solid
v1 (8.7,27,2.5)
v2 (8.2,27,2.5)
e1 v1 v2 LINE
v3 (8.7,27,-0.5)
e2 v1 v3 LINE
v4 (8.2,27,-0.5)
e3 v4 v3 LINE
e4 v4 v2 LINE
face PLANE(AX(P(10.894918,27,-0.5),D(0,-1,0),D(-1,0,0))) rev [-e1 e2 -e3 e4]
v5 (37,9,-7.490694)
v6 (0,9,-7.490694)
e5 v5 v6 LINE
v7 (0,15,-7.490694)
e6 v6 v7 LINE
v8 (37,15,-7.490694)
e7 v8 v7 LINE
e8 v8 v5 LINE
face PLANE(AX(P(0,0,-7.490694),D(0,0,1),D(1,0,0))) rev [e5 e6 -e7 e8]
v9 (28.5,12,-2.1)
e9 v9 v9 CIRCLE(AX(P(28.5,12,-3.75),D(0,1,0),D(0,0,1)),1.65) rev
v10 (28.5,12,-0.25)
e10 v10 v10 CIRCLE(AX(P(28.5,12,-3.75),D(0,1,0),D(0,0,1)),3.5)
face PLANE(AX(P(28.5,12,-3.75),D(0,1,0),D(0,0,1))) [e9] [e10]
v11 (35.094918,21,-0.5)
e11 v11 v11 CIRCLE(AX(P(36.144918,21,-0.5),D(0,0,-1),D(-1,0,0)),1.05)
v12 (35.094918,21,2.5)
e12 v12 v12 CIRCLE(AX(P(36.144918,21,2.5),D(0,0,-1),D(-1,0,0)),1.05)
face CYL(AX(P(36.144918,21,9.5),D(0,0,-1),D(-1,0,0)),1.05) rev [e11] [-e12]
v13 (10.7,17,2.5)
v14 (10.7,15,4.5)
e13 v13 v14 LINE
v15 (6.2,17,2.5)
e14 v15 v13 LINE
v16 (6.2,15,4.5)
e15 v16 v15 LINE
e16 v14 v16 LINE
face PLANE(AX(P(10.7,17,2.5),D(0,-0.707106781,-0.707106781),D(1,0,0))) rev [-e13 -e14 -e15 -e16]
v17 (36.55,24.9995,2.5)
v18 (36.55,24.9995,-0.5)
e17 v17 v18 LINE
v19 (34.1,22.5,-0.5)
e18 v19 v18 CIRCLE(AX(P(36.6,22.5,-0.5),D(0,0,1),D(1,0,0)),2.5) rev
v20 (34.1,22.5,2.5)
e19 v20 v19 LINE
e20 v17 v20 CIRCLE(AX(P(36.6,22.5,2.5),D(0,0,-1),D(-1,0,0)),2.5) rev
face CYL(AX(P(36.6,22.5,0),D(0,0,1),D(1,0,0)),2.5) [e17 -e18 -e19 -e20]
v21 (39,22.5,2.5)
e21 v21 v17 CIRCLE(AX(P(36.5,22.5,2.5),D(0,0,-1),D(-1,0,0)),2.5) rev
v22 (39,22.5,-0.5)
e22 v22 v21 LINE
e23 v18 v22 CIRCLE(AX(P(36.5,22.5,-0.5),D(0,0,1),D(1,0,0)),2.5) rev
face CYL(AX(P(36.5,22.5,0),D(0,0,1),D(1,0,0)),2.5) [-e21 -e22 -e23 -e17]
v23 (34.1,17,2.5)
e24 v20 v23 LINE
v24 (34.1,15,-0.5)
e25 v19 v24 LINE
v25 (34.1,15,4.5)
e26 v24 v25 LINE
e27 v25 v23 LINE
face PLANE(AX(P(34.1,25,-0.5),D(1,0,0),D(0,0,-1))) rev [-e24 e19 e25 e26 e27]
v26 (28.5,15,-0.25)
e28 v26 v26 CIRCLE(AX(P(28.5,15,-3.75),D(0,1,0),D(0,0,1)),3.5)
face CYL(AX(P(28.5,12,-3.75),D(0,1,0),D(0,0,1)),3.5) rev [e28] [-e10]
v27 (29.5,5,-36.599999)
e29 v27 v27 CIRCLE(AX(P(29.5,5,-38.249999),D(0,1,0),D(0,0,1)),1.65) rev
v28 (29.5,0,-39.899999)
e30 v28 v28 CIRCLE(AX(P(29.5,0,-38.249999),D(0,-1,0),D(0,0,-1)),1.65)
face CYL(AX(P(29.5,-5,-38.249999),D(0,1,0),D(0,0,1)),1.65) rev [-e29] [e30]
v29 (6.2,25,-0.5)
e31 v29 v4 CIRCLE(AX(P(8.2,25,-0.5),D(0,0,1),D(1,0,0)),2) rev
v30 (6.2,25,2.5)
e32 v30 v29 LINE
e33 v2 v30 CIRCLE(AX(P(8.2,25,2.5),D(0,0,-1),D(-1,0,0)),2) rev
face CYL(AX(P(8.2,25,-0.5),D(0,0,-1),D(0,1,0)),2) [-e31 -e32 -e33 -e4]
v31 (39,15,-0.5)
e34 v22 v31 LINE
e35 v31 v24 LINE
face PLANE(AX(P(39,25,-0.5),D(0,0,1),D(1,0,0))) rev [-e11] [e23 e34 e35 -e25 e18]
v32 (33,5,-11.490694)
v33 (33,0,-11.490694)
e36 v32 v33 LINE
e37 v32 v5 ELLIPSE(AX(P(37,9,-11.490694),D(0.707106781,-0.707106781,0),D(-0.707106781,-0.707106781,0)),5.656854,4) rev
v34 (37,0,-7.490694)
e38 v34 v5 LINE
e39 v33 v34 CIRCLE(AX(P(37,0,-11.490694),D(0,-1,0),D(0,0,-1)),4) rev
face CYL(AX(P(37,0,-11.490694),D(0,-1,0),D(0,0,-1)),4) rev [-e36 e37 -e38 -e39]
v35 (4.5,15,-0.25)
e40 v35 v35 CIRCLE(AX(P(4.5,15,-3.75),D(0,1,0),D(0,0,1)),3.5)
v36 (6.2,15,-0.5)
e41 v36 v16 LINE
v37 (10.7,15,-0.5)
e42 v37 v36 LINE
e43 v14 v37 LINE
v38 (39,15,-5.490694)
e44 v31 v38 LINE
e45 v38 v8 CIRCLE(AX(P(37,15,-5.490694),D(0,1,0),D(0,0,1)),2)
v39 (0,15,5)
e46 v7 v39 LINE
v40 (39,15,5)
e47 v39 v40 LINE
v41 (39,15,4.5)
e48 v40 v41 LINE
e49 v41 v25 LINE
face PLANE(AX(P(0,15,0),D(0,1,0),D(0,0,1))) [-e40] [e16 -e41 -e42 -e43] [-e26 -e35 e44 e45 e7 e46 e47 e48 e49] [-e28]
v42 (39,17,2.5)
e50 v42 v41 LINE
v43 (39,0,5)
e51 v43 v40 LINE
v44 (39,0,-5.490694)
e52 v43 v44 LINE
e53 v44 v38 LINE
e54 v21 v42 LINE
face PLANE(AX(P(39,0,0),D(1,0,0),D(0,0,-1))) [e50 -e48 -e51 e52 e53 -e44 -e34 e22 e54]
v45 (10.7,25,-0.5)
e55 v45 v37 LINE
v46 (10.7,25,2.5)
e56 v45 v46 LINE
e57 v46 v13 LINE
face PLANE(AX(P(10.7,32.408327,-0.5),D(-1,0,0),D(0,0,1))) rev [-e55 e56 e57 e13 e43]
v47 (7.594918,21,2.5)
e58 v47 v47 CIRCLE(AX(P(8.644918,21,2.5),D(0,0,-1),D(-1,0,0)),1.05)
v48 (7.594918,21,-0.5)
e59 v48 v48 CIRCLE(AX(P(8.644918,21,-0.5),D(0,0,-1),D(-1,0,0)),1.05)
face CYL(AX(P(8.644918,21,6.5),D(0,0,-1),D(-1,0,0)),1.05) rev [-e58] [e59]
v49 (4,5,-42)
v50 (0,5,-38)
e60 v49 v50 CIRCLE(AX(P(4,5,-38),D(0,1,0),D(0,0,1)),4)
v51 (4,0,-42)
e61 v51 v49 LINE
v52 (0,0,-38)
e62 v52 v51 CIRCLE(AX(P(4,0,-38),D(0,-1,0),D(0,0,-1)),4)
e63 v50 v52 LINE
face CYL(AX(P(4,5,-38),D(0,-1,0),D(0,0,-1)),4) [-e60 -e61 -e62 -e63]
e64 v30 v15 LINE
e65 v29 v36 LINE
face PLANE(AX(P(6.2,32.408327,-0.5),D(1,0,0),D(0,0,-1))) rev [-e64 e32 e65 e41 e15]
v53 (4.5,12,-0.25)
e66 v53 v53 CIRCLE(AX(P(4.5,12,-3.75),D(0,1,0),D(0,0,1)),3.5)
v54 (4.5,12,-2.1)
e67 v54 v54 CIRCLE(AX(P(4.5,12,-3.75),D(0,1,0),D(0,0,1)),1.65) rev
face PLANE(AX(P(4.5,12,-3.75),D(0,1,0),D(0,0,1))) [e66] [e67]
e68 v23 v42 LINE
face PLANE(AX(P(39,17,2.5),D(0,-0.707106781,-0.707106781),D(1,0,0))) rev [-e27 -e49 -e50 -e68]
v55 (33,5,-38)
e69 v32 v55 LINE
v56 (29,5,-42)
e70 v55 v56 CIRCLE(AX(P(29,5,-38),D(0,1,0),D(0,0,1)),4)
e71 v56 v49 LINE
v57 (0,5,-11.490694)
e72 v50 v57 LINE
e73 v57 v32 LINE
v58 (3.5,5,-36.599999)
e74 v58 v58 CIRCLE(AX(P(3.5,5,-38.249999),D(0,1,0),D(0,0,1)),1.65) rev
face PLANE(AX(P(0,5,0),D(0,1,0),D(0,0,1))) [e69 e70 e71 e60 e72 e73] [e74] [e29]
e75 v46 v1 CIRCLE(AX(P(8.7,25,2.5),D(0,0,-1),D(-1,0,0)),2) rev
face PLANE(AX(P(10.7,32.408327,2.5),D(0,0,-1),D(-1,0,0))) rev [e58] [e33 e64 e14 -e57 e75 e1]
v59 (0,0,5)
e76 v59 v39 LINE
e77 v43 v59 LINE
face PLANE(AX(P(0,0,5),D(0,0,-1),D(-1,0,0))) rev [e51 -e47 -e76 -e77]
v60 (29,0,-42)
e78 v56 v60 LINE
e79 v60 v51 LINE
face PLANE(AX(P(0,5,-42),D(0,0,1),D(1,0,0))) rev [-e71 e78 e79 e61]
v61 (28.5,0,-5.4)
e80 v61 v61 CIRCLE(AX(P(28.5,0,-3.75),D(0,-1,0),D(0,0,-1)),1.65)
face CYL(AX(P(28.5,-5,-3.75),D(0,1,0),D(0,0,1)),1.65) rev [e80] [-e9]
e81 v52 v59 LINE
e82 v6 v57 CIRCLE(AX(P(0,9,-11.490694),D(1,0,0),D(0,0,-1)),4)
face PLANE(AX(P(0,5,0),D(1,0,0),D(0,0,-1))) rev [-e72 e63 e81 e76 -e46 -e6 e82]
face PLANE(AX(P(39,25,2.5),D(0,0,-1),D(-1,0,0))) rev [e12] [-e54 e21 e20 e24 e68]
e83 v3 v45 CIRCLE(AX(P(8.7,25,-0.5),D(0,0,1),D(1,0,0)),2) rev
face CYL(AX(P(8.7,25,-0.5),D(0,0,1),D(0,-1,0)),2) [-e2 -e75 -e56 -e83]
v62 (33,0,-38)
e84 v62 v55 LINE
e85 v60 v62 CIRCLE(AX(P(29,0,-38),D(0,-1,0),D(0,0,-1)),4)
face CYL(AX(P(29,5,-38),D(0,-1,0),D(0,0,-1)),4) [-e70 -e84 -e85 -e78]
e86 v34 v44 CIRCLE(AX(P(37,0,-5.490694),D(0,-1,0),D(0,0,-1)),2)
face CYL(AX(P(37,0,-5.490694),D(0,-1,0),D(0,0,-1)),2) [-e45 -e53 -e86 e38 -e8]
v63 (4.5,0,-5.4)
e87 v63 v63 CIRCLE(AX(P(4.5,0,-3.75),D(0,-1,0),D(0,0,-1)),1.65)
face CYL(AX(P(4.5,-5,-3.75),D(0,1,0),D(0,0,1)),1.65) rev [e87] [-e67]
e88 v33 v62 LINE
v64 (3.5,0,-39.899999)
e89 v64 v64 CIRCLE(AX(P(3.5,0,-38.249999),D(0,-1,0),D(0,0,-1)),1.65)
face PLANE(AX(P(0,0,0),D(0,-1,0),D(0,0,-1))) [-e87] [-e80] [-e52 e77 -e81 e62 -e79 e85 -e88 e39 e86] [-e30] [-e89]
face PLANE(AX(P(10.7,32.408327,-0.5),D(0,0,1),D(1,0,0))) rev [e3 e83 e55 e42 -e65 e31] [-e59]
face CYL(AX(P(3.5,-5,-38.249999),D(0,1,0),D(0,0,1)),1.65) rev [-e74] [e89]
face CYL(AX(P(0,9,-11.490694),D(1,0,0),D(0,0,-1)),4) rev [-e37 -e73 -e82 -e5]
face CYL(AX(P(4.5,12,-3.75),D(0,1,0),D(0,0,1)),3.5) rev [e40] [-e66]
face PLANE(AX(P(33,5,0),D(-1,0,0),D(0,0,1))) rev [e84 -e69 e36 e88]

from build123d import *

# Parameters (mm, degrees)
SKETCH1_W           = 33
SKETCH1_H           = 42
BOSS_EXTRUDE1_DEPTH = 5
SKETCH4_R           = 1.65
CUT_EXTRUDE1_DEPTH  = 10
SKETCH6_W           = 6
SKETCH6_H           = 7.490694283
BOSS_EXTRUDE2_DEPTH = 5
BOSS_EXTRUDE4_START = 10
SKETCH8_R           = 1.65
BOSS_EXTRUDE4_DEPTH = 10
SKETCH9_W           = 4.9
SKETCH9_H           = 3
BOSS_EXTRUDE5_DEPTH = 10
FILLET2_R           = 2.5
CUT_EXTRUDE3_DEPTH  = 10
SKETCH11_W          = 33
SKETCH11_H          = 34.509305717
CUT_EXTRUDE4_DEPTH  = 10
FILLET3_R           = 4
FILLET4_R           = 2
FILLET5_R           = 4
SKETCH12_R          = 3.5
CUT_EXTRUDE5_DEPTH  = 3
SKETCH13_W          = 4.5
SKETCH13_H          = 3
BOSS_EXTRUDE6_DEPTH = 12
FILLET6_R           = 2
CUT_EXTRUDE6_DEPTH  = 7
CHAMFER1_SIZE       = 2


# Some blends are built 0.0001 mm under size
with BuildPart() as part:
    # Sketch1 → Boss-Extrude1 (new body)
    with BuildSketch(Plane(origin=(0, 0, 0), x_dir=(1, 0, 0), z_dir=(0, 1, 0))):
        with Locations((16.5, 21)):
            Rectangle(SKETCH1_W, SKETCH1_H)
    extrude(amount=BOSS_EXTRUDE1_DEPTH)

    # Sketch4 → Cut-Extrude1 (cut)
    with BuildSketch(Plane(origin=(0, 5, 0), x_dir=(1, 0, 0), z_dir=(0, 1, 0))):
        with Locations(Location((4.500000179, 3.75, 0), (0, 0, 270))):
            Circle(SKETCH4_R)
        with Locations(Location((3.500000179, 38.249999434, 0), (0, 0, 270))):
            Circle(SKETCH4_R)
        with Locations(Location((29.5, 38.249999434, 0), (0, 0, 270))):
            Circle(SKETCH4_R)
        with Locations(Location((28.5, 3.75, 0), (0, 0, 270))):
            Circle(SKETCH4_R)
    extrude(amount=-CUT_EXTRUDE1_DEPTH, mode=Mode.SUBTRACT)

    # Sketch6 → Boss-Extrude2 (add)
    with BuildSketch(Plane(origin=(0, 5, 0), x_dir=(1, 0, 0), z_dir=(0, 1, 0))):
        with Locations((36, 3.745347142)):
            Rectangle(SKETCH6_W, SKETCH6_H)
        Polygon((0, -5), (0, 0), (33, 0), (39, 0), (39, -5), align=None)
    extrude(amount=-BOSS_EXTRUDE2_DEPTH)

    # Sketch8 → Boss-Extrude4 (add)
    with BuildSketch(Plane(origin=(0, 5, 0), x_dir=(1, 0, 0), z_dir=(0, 1, 0)).offset(BOSS_EXTRUDE4_START)):
        Polygon((39, 7.490694283), (33, 7.490694283), (33, 42), (0, 42), (0, -5), (39, -5), align=None)
        with Locations(Location((29.5, 38.249999434, 0), (0, 0, 270))):
            Circle(SKETCH8_R, mode=Mode.SUBTRACT)
        with Locations(Location((3.500000179, 38.249999434, 0), (0, 0, 270))):
            Circle(SKETCH8_R, mode=Mode.SUBTRACT)
        with Locations(Location((4.500000179, 3.75, 0), (0, 0, 270))):
            Circle(SKETCH8_R, mode=Mode.SUBTRACT)
        with Locations(Location((28.5, 3.75, 0), (0, 0, 270))):
            Circle(SKETCH8_R, mode=Mode.SUBTRACT)
    extrude(amount=-BOSS_EXTRUDE4_DEPTH)

    # Sketch9 → Boss-Extrude5 (add)
    with BuildSketch(Plane(origin=(0, 15, 0), x_dir=(1, 0, 0), z_dir=(0, 1, 0))):
        with Locations((36.55, -1)):
            Rectangle(SKETCH9_W, SKETCH9_H)
    extrude(amount=BOSS_EXTRUDE5_DEPTH)

    # Fillet2
    # the kernel refuses this fillet: 2.5 mm, written as the material it takes off along each edge
    with BuildSketch(Plane(origin=(34.1, 25, -6.75), x_dir=(0, -1, 0), z_dir=(0, 0, 1)), Plane(origin=(39, 25, 8.75), x_dir=(0, -1, 0), z_dir=(0, 0, -1))) as fillet2_piece_1:
        with BuildLine():
            CenterArc((FILLET2_R, FILLET2_R), FILLET2_R, 180, 90)
            Line((0, FILLET2_R), (0, 0))
            Line((0, 0), (FILLET2_R, 0))
        make_face()
    extrude(amount=15.5, mode=Mode.SUBTRACT)

    # Sketch10 → Cut-Extrude3 (cut)
    with BuildSketch(Plane(origin=(0, 0, -0.5), x_dir=(-1, 0, 0), z_dir=(0, 0, -1))):
        with BuildLine():
            ThreePointArc((-37.068227721, 21.5), (-37.194918455, 21), (-37.068227721, 20.5))
            ThreePointArc((-37.068227721, 20.5), (-35.887018018, 19.982165355), (-35.094918455, 21))
            ThreePointArc((-35.094918455, 21), (-35.887018018, 22.017834645), (-37.068227721, 21.5))
        make_face()
    extrude(amount=-CUT_EXTRUDE3_DEPTH, mode=Mode.SUBTRACT)

    # Sketch11 → Cut-Extrude4 (cut)
    with BuildSketch(Plane(origin=(0, 15, 0), x_dir=(1, 0, 0), z_dir=(0, 1, 0))):
        with Locations((16.5, 24.745347142)):
            Rectangle(SKETCH11_W, SKETCH11_H)
    extrude(amount=-CUT_EXTRUDE4_DEPTH, mode=Mode.SUBTRACT)

    # Fillet3
    fillet3_edges = [part.edges().sort_by_distance(p)[0] for p in [
        (0, 2.5, -42),
        (33, 2.5, -42),
        (33, 2.5, -7.490694283),
    ]]
    fillet(fillet3_edges, radius=FILLET3_R)

    # Fillet4
    fillet4_edges = [part.edges().sort_by_distance(p)[0] for p in [
        (39, 7.5, -7.490694283),
    ]]
    fillet(fillet4_edges, radius=FILLET4_R - 0.0001)  # a hair under: the kernel refuses the full size

    # Fillet5
    fillet5_edges = [part.edges().sort_by_distance(p)[0] for p in [
        (18.5, 5, -7.490694283),
    ]]
    fillet(fillet5_edges, radius=FILLET5_R)

    # Sketch12 → Cut-Extrude5 (cut)
    with BuildSketch(Plane(origin=(0, 15, 0), x_dir=(1, 0, 0), z_dir=(0, 1, 0))):
        with Locations(Location((4.500000179, 3.75, 0), (0, 0, 270))):
            Circle(SKETCH12_R)
        with Locations(Location((28.5, 3.75, 0), (0, 0, 270))):
            Circle(SKETCH12_R)
    extrude(amount=-CUT_EXTRUDE5_DEPTH, mode=Mode.SUBTRACT)

    # Sketch13 → Boss-Extrude6 (add)
    with BuildSketch(Plane(origin=(0, 15, 0), x_dir=(1, 0, 0), z_dir=(0, 1, 0))):
        with Locations((8.45, -1)):
            Rectangle(SKETCH13_W, SKETCH13_H)
    extrude(amount=BOSS_EXTRUDE6_DEPTH)

    # Fillet6
    fillet6_edges = [part.edges().sort_by_distance(p)[0] for p in [
        (6.2, 27, 1),
        (10.7, 27, 1),
    ]]
    fillet(fillet6_edges, radius=FILLET6_R)

    # Sketch14 → Cut-Extrude6 (cut)
    with BuildSketch(Plane(origin=(0, 0, -0.5), x_dir=(-1, 0, 0), z_dir=(0, 0, -1))):
        with BuildLine():
            ThreePointArc((-7.594918455, 21), (-7.62708381, 21.257900437), (-7.721609189, 21.5))
            ThreePointArc((-7.721609189, 21.5), (-9.694918455, 21), (-7.721609189, 20.5))
            ThreePointArc((-7.721609189, 20.5), (-7.62708381, 20.742099563), (-7.594918455, 21))
        make_face()
    extrude(amount=-CUT_EXTRUDE6_DEPTH, mode=Mode.SUBTRACT)

    # Chamfer1
    chamfer1_edges = [part.edges().sort_by_distance(p)[0] for p in [
        (8.45, 15, 2.5),
        (36.55, 15, 2.5),
    ]]
    chamfer(chamfer1_edges, length=CHAMFER1_SIZE)


solid = part.part
